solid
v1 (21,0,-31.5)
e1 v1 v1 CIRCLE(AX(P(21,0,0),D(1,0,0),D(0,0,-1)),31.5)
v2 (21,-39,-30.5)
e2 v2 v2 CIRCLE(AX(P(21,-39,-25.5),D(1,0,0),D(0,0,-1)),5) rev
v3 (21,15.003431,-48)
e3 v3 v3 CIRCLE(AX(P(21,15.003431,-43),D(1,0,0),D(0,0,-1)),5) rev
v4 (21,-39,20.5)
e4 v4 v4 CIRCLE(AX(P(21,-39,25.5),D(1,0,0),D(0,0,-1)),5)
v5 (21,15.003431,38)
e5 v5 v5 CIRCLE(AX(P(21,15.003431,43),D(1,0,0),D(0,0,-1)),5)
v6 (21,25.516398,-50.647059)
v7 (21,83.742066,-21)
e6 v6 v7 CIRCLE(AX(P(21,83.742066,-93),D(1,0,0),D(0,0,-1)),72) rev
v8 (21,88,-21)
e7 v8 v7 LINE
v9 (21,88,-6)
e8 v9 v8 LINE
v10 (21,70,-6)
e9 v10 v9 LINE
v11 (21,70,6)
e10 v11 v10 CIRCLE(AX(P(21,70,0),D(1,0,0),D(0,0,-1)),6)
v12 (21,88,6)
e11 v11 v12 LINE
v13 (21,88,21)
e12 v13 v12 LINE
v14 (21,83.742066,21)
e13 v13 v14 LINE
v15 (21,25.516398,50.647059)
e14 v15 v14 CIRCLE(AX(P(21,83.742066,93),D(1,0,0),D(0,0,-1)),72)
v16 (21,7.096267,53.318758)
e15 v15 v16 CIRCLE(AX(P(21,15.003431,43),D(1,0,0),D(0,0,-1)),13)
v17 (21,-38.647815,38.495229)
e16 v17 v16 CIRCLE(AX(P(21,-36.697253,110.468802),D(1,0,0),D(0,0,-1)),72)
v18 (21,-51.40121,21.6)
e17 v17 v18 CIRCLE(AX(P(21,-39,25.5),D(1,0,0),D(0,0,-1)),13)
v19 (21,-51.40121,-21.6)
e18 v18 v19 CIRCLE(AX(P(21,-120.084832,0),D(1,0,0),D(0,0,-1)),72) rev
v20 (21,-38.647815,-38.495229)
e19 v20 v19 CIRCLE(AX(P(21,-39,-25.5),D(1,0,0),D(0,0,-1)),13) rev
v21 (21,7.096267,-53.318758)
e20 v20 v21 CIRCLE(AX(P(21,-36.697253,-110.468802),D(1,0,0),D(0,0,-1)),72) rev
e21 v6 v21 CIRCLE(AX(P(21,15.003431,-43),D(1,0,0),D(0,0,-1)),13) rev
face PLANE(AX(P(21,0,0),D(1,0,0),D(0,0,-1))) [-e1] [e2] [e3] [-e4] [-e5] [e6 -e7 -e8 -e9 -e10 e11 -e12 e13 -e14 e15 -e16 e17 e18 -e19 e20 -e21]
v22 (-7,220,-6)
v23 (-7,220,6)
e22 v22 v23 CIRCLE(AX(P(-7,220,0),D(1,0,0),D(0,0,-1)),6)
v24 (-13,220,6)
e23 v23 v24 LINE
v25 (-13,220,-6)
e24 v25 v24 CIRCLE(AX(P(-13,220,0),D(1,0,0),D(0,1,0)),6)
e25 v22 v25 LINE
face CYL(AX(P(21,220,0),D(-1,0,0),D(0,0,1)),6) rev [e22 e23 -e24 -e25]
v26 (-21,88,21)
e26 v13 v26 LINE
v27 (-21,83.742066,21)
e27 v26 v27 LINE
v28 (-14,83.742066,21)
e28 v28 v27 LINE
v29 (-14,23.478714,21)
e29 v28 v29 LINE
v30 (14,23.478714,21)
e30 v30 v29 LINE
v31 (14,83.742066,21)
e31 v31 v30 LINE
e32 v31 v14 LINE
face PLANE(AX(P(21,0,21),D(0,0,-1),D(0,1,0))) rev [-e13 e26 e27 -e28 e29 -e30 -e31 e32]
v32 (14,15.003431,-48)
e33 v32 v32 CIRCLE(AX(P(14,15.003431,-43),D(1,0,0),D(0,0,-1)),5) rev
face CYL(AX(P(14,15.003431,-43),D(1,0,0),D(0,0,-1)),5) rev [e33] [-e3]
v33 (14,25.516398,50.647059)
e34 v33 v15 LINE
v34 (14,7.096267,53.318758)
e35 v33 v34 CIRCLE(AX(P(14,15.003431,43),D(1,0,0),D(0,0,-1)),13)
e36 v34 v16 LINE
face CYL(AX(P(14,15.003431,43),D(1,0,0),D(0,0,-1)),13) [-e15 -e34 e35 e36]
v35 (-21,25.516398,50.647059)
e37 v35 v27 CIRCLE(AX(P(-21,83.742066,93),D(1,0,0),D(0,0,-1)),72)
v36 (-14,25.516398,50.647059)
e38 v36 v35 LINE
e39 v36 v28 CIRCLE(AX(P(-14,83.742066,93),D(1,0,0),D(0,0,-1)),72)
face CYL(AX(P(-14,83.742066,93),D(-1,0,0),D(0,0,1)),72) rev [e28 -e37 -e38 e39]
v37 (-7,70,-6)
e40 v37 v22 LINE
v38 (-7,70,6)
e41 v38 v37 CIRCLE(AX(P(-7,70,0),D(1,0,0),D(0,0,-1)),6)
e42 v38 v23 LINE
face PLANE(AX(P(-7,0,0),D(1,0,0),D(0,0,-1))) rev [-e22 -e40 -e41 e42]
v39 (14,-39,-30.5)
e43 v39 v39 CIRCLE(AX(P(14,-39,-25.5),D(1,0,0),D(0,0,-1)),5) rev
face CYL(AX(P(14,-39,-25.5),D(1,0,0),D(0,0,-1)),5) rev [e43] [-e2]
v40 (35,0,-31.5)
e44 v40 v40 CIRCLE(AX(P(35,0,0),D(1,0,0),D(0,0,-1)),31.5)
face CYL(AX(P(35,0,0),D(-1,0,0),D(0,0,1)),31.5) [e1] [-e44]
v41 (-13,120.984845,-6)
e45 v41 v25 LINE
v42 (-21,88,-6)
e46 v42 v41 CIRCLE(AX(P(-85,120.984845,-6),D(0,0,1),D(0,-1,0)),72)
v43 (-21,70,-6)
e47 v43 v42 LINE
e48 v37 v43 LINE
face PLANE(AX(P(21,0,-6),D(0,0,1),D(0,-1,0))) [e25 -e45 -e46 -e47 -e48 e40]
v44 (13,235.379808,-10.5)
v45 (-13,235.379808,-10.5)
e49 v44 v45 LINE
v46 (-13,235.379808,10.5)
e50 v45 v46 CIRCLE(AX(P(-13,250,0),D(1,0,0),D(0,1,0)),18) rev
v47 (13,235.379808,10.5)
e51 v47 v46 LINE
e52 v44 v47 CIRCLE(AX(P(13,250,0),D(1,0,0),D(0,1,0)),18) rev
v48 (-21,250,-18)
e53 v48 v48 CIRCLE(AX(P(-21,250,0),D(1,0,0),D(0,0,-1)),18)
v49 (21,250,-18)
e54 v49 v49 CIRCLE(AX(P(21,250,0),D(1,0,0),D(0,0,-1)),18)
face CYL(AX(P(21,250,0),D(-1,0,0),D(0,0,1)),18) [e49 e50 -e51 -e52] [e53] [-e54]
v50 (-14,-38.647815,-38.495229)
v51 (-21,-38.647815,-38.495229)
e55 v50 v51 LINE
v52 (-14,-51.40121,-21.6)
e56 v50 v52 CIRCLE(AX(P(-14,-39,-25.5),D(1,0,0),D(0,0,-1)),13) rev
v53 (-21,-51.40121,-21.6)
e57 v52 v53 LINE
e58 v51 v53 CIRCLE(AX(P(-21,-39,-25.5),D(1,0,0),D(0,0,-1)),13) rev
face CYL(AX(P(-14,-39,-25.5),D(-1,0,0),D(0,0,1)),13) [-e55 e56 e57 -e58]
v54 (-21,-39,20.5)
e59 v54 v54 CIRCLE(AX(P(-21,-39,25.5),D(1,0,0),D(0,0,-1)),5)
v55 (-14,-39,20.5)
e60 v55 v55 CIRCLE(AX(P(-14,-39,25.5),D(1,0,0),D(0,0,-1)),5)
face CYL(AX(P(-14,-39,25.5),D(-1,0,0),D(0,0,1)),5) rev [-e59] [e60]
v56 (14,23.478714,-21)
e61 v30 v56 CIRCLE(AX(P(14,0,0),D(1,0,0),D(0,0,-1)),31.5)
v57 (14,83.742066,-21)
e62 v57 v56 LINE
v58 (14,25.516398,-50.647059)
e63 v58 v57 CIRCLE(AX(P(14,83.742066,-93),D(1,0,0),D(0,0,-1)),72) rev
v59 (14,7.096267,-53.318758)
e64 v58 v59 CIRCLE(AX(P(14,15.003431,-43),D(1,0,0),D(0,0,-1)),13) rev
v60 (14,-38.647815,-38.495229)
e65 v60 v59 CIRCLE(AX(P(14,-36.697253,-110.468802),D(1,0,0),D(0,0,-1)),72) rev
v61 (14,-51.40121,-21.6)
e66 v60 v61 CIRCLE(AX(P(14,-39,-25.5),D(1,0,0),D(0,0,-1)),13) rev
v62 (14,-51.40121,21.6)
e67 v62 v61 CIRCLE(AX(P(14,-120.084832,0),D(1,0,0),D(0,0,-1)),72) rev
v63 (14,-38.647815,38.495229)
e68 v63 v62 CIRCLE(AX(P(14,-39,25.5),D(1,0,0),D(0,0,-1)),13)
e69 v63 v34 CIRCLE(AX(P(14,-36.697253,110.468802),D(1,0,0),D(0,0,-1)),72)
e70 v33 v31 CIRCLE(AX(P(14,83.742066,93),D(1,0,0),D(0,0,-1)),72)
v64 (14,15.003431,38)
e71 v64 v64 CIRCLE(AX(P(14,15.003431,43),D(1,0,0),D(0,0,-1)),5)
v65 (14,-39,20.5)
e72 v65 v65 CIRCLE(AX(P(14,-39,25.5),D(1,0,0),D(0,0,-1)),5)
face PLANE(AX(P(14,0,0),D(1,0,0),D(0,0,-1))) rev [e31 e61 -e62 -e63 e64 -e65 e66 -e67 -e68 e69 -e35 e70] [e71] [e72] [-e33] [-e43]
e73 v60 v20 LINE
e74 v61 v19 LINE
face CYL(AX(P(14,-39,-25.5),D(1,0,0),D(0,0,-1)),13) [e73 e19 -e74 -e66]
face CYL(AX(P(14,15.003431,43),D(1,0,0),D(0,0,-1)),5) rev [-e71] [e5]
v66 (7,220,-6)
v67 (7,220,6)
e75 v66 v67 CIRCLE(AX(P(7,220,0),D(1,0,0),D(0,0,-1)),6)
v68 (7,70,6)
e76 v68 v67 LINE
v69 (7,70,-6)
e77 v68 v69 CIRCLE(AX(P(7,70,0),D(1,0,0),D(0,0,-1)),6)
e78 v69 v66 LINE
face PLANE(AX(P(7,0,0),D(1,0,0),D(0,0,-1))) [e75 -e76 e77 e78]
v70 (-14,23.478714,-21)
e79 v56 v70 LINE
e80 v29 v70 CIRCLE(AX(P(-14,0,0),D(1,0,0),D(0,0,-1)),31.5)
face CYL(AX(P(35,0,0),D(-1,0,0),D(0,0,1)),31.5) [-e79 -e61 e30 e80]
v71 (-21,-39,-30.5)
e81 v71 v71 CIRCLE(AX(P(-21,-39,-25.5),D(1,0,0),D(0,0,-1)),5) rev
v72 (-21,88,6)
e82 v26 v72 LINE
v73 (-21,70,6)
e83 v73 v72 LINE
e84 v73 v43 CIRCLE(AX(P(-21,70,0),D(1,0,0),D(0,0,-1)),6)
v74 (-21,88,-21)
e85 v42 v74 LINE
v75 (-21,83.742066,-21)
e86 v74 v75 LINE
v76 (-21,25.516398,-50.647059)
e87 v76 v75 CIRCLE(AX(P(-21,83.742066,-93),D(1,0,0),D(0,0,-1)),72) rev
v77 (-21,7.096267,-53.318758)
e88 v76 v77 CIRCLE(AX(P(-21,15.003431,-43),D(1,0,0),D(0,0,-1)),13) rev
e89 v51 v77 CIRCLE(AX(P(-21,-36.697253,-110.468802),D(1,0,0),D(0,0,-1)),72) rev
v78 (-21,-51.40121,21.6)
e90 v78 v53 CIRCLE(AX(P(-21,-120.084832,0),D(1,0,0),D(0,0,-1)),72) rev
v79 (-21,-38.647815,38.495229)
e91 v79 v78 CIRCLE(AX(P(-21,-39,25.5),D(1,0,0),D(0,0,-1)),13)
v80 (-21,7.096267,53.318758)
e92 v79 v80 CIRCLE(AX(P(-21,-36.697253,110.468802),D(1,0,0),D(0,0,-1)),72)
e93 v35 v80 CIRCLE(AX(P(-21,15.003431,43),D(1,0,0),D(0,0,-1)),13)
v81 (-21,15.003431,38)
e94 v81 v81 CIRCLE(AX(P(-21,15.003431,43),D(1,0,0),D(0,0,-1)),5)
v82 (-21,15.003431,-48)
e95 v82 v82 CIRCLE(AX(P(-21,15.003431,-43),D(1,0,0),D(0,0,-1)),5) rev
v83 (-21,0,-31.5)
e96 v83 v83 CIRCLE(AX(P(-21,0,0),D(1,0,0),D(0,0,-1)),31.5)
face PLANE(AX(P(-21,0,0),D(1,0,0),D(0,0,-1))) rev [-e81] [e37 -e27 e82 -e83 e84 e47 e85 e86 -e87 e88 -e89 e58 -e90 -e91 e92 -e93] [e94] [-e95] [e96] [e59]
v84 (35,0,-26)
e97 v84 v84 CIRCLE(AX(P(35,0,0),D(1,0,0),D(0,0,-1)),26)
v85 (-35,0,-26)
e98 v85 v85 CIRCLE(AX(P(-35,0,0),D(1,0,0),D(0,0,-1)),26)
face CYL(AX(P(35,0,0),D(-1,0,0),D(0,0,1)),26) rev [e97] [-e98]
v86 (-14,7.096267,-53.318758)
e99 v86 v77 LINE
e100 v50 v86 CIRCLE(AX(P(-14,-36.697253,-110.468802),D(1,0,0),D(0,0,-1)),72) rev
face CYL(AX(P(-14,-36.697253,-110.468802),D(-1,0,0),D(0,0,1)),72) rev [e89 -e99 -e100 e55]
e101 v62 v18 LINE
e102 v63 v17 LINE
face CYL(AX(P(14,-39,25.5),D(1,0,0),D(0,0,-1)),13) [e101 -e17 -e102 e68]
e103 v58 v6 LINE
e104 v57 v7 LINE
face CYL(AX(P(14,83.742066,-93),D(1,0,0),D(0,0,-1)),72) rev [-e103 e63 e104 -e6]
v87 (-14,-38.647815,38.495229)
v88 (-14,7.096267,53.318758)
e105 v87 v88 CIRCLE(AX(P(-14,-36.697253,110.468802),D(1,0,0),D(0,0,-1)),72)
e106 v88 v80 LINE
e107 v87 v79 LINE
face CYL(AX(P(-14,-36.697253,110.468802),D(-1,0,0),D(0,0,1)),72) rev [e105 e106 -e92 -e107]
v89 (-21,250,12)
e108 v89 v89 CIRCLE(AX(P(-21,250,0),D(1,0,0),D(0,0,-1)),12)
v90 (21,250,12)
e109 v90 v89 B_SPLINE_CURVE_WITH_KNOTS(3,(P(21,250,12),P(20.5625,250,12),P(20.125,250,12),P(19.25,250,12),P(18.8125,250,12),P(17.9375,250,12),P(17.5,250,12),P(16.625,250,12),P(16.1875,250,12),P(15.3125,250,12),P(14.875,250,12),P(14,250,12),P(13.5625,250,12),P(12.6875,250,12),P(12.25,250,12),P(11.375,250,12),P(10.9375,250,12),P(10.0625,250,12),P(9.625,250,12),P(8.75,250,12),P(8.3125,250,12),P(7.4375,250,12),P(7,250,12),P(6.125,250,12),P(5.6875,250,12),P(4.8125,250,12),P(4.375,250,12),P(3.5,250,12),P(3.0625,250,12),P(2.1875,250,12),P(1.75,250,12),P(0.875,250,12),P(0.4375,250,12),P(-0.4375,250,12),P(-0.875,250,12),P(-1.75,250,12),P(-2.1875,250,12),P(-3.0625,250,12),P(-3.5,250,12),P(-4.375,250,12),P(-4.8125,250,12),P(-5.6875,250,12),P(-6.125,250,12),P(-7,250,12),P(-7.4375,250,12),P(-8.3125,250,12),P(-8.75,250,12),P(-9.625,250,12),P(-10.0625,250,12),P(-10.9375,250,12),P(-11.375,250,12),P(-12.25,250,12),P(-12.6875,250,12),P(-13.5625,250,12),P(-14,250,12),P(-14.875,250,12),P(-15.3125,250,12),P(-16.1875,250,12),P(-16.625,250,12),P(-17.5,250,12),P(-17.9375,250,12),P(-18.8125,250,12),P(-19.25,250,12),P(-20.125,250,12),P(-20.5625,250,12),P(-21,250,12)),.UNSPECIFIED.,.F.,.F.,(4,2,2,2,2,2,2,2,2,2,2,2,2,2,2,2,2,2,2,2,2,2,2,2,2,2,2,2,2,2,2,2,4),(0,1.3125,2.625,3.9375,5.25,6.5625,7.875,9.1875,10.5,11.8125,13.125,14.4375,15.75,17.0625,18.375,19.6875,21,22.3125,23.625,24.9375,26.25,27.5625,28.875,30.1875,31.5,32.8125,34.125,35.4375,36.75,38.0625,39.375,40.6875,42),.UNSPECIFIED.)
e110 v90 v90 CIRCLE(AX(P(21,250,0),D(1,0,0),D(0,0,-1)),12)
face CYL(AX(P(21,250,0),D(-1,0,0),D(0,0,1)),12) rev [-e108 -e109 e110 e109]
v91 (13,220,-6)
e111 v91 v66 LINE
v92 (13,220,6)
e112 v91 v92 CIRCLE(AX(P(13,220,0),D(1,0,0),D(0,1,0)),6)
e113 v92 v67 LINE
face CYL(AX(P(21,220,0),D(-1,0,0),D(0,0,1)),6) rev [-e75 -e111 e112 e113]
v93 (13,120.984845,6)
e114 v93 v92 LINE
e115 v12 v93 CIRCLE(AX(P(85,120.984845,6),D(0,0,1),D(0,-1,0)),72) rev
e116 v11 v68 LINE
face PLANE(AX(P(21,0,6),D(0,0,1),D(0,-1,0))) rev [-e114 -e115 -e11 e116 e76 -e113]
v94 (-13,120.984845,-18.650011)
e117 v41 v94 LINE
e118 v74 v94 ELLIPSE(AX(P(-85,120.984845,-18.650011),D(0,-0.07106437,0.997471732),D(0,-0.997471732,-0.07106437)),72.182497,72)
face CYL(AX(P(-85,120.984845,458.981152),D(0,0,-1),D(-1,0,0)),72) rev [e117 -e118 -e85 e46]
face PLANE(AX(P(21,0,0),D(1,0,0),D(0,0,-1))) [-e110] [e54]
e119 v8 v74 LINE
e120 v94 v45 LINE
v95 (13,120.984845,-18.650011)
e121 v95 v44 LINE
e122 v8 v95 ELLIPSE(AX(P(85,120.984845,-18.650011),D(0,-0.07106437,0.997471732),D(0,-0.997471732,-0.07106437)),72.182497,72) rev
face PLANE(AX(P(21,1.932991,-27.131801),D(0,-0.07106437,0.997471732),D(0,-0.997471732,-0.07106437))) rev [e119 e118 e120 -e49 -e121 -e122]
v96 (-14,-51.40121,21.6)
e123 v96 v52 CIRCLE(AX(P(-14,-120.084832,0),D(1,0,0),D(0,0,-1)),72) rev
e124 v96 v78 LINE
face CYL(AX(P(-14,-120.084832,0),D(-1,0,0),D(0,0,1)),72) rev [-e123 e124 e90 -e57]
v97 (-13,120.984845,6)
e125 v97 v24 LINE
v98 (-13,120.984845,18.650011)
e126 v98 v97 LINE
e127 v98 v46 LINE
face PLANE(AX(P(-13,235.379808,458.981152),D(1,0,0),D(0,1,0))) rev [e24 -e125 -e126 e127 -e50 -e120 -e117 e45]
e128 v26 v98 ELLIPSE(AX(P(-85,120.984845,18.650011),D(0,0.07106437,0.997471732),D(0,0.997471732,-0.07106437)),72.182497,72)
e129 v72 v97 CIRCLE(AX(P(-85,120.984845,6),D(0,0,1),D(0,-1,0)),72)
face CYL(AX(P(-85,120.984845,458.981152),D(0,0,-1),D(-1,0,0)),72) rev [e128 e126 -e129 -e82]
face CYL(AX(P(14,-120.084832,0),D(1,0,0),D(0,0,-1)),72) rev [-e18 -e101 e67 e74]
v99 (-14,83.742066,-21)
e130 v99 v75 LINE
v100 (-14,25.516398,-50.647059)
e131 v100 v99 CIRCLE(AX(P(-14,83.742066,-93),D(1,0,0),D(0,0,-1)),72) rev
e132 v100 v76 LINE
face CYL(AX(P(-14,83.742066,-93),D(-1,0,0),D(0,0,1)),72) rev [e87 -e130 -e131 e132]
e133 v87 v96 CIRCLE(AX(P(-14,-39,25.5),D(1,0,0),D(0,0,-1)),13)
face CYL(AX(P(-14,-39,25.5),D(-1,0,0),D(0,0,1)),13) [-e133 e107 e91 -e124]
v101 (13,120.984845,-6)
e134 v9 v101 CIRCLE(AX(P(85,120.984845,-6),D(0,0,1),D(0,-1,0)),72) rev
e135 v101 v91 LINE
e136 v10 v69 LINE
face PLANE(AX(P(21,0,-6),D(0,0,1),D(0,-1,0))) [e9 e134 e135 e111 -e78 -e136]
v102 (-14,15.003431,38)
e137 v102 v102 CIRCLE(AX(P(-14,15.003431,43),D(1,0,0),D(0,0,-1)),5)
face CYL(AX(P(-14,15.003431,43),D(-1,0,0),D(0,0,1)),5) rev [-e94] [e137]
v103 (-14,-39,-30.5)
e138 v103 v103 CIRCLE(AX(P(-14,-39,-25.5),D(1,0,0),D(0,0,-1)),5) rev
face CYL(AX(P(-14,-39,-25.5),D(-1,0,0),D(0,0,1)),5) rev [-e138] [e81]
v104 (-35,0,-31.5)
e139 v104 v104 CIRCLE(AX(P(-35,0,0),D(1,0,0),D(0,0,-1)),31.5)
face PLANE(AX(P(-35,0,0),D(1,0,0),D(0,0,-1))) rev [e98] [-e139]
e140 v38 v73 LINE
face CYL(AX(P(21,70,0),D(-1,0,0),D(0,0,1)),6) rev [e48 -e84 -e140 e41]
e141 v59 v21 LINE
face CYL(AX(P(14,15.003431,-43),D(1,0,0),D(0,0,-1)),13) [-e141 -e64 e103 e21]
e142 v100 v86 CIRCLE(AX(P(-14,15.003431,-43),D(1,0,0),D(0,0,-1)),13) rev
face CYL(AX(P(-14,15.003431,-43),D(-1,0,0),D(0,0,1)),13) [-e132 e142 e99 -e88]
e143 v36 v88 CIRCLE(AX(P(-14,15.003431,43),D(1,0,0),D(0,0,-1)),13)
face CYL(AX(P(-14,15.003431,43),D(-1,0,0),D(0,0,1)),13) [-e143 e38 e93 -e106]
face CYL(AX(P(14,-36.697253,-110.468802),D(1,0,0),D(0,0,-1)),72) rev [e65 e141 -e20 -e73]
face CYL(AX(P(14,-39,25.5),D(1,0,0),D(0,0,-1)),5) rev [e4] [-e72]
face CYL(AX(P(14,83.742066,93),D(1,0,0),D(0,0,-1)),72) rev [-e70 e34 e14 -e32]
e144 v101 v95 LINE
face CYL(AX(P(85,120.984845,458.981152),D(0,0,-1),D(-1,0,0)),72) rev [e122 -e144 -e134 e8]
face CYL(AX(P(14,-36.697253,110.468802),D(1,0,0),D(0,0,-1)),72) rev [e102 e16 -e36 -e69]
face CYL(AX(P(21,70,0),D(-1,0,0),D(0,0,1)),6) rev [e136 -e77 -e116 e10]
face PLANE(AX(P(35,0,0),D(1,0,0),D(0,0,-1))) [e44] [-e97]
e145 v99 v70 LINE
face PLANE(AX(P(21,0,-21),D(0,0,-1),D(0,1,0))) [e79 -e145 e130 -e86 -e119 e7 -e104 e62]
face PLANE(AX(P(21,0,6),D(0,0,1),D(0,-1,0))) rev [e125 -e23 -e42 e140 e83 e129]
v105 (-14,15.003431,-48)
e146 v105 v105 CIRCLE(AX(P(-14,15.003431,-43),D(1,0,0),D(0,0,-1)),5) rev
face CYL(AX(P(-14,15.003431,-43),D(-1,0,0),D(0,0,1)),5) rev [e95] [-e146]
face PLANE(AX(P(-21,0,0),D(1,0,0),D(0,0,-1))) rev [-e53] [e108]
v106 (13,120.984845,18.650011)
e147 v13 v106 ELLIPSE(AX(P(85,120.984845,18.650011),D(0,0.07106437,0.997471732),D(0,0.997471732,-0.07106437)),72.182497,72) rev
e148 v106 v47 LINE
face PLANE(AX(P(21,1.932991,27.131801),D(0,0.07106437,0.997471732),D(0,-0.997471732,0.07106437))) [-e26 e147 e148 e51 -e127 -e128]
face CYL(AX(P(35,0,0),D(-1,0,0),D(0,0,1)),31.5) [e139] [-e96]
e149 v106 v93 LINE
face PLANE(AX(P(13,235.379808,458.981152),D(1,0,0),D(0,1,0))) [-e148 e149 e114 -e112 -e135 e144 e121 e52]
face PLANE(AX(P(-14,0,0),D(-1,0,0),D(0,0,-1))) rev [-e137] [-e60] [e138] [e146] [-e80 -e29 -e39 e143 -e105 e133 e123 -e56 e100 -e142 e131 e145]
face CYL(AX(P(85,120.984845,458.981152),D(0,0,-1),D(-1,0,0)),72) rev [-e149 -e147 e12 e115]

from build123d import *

# Parameters (mm, degrees)
SKETCH1_R           = 31.5
SKETCH1_R_2         = 26
BOSS_EXTRUDE1_DEPTH = 35
SKETCH1_3_R         = 18
SKETCH1_3_R_2       = 12
BOSS_EXTRUDE2_DEPTH = 21
BOSS_EXTRUDE3_DEPTH = 21
BOSS_EXTRUDE4_DEPTH = 7
SKETCH2_R           = 5
BOSS_EXTRUDE5_DEPTH = 7
CUT_EXTRUDE6_START  = -21
CUT_EXTRUDE6_DEPTH  = 42
SKETCH1_7_R         = 18
SKETCH1_7_R_2       = 12
BOSS_EXTRUDE6_DEPTH = 21


with BuildPart() as part:
    # Sketch1 → Boss-Extrude1 (new, symmetric)
    with BuildSketch(Plane.YZ):
        with Locations(Location((0, 0, 0), (0, 0, 270))):
            Circle(SKETCH1_R)
        with Locations(Location((0, 0, 0), (0, 0, 270))):
            Circle(SKETCH1_R_2, mode=Mode.SUBTRACT)
    extrude(amount=BOSS_EXTRUDE1_DEPTH, both=True)



with BuildPart() as body_2:
    # Sketch1<3> → Boss-Extrude2 (new, symmetric)
    with BuildSketch(Plane.YZ):
        with Locations(Location((250, 0, 0), (0, 0, 90))):
            Circle(SKETCH1_3_R)
        with Locations(Location((250, 0, 0), (0, 0, 90))):
            Circle(SKETCH1_3_R_2, mode=Mode.SUBTRACT)
    extrude(amount=BOSS_EXTRUDE2_DEPTH, both=True)


with BuildPart() as part_1:
    add(part.part)

    add(body_2.part)  # Boss-Extrude3 merges body 2
    # Sketch1<4> → Boss-Extrude3 (add, symmetric)
    with BuildSketch(Plane.YZ):
        with BuildLine():
            Line((235.379808483, 10.5), (88, 21))
            Line((88, 21), (23.478713764, 21))
            ThreePointArc((23.478713764, 21), (29.426429307, 11.239895828), (31.5, 0))
            ThreePointArc((31.5, 0), (29.426429307, -11.239895828), (23.478713764, -21))
            Line((23.478713764, -21), (88, -21))
            Line((88, -21), (235.379808483, -10.5))
            ThreePointArc((235.379808483, -10.5), (232, 0), (235.379808483, 10.5))
        make_face()
        with BuildLine():
            ThreePointArc((70, -6), (64, 0), (70, 6))
            Line((70, 6), (220, 6))
            ThreePointArc((220, 6), (226, 0), (220, -6))
            Line((220, -6), (70, -6))
        make_face(mode=Mode.SUBTRACT)
    extrude(amount=BOSS_EXTRUDE3_DEPTH, both=True)

    # Sketch1<5> → Boss-Extrude4 (add, symmetric)
    with BuildSketch(Plane.YZ):
        with BuildLine():
            Line((70, -6), (220, -6))
            ThreePointArc((220, -6), (226, 0), (220, 6))
            Line((220, 6), (70, 6))
            ThreePointArc((70, 6), (64, 0), (70, -6))
        make_face()
    extrude(amount=BOSS_EXTRUDE4_DEPTH, both=True)

    # Sketch2 → Boss-Extrude5 (add)
    with BuildSketch(Plane.YZ.offset(21)):
        with BuildLine():
            ThreePointArc((25.516398298, -50.647058824), (51.072598285, -28.838439215), (83.742065952, -21))
            Line((83.742065952, -21), (23.478713764, -21))
            ThreePointArc((23.478713764, -21), (-31.5, 0), (23.478713764, 21))
            Line((23.478713764, 21), (83.742065952, 21))
            ThreePointArc((83.742065952, 21), (51.072598285, 28.838439215), (25.516398298, 50.647058824))
            ThreePointArc((25.516398298, 50.647058824), (16.869455228, 55.865378029), (7.0962671, 53.318757993))
            ThreePointArc((7.0962671, 53.318757993), (-14.501700837, 41.975317571), (-38.64781523, 38.495228582))
            ThreePointArc((-38.64781523, 38.495228582), (-49.375786098, 33.332181232), (-51.401209618, 21.6))
            ThreePointArc((-51.401209618, 21.6), (-48.08483212, 0), (-51.401209618, -21.6))
            ThreePointArc((-51.401209618, -21.6), (-49.375786098, -33.332181232), (-38.64781523, -38.495228582))
            ThreePointArc((-38.64781523, -38.495228582), (-14.501700837, -41.975317571), (7.0962671, -53.318757993))
            ThreePointArc((7.0962671, -53.318757993), (16.869455228, -55.865378029), (25.516398298, -50.647058824))
        make_face()
        with Locations(Location((15.003430528, -43, 0), (0, 0, 270))):
            Circle(SKETCH2_R, mode=Mode.SUBTRACT)
        with Locations(Location((-39, -25.5, 0), (0, 0, 270))):
            Circle(SKETCH2_R, mode=Mode.SUBTRACT)
        with Locations(Location((-39, 25.5, 0), (0, 0, 270))):
            Circle(SKETCH2_R, mode=Mode.SUBTRACT)
        with Locations(Location((15.003430528, 43, 0), (0, 0, 270))):
            Circle(SKETCH2_R, mode=Mode.SUBTRACT)
    boss_extrude5 = extrude(amount=-BOSS_EXTRUDE5_DEPTH)

    # Mirror1: Boss-Extrude5 across plane
    add(boss_extrude5.mirror(Plane(origin=(0, 0, 0), x_dir=(0, 0, 1), z_dir=(1, 0, 0))))

    # Cut-Extrude6: read off the stored shape, not the designer's step
    # Cut-Extrude6 outline → Cut-Extrude6 (cut)
    with BuildSketch(Plane(origin=(0, 0, 0), x_dir=(0, 1, 0), z_dir=(0, 0, 1)).offset(CUT_EXTRUDE6_START)):
        with BuildLine():
            ThreePointArc((88, 21), (104.014282256, 15.028577262), (120.984845005, 13))
            Line((120.984845005, 13), (235.379808483, 13))
            Line((235.379808483, 13), (235.379808483, 21))
            Line((235.379808483, 21), (88, 21))
        make_face()
    cut_extrude6 = extrude(amount=CUT_EXTRUDE6_DEPTH, mode=Mode.SUBTRACT)

    # Mirror2: Cut-Extrude6 across plane
    add(cut_extrude6.mirror(Plane(origin=(0, 0, 0), x_dir=(0, 0, 1), z_dir=(1, 0, 0))), mode=Mode.SUBTRACT)

    # Sketch1<7> → Boss-Extrude6 (add, symmetric)
    with BuildSketch(Plane.YZ):
        with Locations(Location((250, 0, 0), (0, 0, 270))):
            Circle(SKETCH1_7_R)
        with Locations(Location((250, 0, 0), (0, 0, 90))):
            Circle(SKETCH1_7_R_2, mode=Mode.SUBTRACT)
    extrude(amount=BOSS_EXTRUDE6_DEPTH, both=True)


solid = part_1.part
